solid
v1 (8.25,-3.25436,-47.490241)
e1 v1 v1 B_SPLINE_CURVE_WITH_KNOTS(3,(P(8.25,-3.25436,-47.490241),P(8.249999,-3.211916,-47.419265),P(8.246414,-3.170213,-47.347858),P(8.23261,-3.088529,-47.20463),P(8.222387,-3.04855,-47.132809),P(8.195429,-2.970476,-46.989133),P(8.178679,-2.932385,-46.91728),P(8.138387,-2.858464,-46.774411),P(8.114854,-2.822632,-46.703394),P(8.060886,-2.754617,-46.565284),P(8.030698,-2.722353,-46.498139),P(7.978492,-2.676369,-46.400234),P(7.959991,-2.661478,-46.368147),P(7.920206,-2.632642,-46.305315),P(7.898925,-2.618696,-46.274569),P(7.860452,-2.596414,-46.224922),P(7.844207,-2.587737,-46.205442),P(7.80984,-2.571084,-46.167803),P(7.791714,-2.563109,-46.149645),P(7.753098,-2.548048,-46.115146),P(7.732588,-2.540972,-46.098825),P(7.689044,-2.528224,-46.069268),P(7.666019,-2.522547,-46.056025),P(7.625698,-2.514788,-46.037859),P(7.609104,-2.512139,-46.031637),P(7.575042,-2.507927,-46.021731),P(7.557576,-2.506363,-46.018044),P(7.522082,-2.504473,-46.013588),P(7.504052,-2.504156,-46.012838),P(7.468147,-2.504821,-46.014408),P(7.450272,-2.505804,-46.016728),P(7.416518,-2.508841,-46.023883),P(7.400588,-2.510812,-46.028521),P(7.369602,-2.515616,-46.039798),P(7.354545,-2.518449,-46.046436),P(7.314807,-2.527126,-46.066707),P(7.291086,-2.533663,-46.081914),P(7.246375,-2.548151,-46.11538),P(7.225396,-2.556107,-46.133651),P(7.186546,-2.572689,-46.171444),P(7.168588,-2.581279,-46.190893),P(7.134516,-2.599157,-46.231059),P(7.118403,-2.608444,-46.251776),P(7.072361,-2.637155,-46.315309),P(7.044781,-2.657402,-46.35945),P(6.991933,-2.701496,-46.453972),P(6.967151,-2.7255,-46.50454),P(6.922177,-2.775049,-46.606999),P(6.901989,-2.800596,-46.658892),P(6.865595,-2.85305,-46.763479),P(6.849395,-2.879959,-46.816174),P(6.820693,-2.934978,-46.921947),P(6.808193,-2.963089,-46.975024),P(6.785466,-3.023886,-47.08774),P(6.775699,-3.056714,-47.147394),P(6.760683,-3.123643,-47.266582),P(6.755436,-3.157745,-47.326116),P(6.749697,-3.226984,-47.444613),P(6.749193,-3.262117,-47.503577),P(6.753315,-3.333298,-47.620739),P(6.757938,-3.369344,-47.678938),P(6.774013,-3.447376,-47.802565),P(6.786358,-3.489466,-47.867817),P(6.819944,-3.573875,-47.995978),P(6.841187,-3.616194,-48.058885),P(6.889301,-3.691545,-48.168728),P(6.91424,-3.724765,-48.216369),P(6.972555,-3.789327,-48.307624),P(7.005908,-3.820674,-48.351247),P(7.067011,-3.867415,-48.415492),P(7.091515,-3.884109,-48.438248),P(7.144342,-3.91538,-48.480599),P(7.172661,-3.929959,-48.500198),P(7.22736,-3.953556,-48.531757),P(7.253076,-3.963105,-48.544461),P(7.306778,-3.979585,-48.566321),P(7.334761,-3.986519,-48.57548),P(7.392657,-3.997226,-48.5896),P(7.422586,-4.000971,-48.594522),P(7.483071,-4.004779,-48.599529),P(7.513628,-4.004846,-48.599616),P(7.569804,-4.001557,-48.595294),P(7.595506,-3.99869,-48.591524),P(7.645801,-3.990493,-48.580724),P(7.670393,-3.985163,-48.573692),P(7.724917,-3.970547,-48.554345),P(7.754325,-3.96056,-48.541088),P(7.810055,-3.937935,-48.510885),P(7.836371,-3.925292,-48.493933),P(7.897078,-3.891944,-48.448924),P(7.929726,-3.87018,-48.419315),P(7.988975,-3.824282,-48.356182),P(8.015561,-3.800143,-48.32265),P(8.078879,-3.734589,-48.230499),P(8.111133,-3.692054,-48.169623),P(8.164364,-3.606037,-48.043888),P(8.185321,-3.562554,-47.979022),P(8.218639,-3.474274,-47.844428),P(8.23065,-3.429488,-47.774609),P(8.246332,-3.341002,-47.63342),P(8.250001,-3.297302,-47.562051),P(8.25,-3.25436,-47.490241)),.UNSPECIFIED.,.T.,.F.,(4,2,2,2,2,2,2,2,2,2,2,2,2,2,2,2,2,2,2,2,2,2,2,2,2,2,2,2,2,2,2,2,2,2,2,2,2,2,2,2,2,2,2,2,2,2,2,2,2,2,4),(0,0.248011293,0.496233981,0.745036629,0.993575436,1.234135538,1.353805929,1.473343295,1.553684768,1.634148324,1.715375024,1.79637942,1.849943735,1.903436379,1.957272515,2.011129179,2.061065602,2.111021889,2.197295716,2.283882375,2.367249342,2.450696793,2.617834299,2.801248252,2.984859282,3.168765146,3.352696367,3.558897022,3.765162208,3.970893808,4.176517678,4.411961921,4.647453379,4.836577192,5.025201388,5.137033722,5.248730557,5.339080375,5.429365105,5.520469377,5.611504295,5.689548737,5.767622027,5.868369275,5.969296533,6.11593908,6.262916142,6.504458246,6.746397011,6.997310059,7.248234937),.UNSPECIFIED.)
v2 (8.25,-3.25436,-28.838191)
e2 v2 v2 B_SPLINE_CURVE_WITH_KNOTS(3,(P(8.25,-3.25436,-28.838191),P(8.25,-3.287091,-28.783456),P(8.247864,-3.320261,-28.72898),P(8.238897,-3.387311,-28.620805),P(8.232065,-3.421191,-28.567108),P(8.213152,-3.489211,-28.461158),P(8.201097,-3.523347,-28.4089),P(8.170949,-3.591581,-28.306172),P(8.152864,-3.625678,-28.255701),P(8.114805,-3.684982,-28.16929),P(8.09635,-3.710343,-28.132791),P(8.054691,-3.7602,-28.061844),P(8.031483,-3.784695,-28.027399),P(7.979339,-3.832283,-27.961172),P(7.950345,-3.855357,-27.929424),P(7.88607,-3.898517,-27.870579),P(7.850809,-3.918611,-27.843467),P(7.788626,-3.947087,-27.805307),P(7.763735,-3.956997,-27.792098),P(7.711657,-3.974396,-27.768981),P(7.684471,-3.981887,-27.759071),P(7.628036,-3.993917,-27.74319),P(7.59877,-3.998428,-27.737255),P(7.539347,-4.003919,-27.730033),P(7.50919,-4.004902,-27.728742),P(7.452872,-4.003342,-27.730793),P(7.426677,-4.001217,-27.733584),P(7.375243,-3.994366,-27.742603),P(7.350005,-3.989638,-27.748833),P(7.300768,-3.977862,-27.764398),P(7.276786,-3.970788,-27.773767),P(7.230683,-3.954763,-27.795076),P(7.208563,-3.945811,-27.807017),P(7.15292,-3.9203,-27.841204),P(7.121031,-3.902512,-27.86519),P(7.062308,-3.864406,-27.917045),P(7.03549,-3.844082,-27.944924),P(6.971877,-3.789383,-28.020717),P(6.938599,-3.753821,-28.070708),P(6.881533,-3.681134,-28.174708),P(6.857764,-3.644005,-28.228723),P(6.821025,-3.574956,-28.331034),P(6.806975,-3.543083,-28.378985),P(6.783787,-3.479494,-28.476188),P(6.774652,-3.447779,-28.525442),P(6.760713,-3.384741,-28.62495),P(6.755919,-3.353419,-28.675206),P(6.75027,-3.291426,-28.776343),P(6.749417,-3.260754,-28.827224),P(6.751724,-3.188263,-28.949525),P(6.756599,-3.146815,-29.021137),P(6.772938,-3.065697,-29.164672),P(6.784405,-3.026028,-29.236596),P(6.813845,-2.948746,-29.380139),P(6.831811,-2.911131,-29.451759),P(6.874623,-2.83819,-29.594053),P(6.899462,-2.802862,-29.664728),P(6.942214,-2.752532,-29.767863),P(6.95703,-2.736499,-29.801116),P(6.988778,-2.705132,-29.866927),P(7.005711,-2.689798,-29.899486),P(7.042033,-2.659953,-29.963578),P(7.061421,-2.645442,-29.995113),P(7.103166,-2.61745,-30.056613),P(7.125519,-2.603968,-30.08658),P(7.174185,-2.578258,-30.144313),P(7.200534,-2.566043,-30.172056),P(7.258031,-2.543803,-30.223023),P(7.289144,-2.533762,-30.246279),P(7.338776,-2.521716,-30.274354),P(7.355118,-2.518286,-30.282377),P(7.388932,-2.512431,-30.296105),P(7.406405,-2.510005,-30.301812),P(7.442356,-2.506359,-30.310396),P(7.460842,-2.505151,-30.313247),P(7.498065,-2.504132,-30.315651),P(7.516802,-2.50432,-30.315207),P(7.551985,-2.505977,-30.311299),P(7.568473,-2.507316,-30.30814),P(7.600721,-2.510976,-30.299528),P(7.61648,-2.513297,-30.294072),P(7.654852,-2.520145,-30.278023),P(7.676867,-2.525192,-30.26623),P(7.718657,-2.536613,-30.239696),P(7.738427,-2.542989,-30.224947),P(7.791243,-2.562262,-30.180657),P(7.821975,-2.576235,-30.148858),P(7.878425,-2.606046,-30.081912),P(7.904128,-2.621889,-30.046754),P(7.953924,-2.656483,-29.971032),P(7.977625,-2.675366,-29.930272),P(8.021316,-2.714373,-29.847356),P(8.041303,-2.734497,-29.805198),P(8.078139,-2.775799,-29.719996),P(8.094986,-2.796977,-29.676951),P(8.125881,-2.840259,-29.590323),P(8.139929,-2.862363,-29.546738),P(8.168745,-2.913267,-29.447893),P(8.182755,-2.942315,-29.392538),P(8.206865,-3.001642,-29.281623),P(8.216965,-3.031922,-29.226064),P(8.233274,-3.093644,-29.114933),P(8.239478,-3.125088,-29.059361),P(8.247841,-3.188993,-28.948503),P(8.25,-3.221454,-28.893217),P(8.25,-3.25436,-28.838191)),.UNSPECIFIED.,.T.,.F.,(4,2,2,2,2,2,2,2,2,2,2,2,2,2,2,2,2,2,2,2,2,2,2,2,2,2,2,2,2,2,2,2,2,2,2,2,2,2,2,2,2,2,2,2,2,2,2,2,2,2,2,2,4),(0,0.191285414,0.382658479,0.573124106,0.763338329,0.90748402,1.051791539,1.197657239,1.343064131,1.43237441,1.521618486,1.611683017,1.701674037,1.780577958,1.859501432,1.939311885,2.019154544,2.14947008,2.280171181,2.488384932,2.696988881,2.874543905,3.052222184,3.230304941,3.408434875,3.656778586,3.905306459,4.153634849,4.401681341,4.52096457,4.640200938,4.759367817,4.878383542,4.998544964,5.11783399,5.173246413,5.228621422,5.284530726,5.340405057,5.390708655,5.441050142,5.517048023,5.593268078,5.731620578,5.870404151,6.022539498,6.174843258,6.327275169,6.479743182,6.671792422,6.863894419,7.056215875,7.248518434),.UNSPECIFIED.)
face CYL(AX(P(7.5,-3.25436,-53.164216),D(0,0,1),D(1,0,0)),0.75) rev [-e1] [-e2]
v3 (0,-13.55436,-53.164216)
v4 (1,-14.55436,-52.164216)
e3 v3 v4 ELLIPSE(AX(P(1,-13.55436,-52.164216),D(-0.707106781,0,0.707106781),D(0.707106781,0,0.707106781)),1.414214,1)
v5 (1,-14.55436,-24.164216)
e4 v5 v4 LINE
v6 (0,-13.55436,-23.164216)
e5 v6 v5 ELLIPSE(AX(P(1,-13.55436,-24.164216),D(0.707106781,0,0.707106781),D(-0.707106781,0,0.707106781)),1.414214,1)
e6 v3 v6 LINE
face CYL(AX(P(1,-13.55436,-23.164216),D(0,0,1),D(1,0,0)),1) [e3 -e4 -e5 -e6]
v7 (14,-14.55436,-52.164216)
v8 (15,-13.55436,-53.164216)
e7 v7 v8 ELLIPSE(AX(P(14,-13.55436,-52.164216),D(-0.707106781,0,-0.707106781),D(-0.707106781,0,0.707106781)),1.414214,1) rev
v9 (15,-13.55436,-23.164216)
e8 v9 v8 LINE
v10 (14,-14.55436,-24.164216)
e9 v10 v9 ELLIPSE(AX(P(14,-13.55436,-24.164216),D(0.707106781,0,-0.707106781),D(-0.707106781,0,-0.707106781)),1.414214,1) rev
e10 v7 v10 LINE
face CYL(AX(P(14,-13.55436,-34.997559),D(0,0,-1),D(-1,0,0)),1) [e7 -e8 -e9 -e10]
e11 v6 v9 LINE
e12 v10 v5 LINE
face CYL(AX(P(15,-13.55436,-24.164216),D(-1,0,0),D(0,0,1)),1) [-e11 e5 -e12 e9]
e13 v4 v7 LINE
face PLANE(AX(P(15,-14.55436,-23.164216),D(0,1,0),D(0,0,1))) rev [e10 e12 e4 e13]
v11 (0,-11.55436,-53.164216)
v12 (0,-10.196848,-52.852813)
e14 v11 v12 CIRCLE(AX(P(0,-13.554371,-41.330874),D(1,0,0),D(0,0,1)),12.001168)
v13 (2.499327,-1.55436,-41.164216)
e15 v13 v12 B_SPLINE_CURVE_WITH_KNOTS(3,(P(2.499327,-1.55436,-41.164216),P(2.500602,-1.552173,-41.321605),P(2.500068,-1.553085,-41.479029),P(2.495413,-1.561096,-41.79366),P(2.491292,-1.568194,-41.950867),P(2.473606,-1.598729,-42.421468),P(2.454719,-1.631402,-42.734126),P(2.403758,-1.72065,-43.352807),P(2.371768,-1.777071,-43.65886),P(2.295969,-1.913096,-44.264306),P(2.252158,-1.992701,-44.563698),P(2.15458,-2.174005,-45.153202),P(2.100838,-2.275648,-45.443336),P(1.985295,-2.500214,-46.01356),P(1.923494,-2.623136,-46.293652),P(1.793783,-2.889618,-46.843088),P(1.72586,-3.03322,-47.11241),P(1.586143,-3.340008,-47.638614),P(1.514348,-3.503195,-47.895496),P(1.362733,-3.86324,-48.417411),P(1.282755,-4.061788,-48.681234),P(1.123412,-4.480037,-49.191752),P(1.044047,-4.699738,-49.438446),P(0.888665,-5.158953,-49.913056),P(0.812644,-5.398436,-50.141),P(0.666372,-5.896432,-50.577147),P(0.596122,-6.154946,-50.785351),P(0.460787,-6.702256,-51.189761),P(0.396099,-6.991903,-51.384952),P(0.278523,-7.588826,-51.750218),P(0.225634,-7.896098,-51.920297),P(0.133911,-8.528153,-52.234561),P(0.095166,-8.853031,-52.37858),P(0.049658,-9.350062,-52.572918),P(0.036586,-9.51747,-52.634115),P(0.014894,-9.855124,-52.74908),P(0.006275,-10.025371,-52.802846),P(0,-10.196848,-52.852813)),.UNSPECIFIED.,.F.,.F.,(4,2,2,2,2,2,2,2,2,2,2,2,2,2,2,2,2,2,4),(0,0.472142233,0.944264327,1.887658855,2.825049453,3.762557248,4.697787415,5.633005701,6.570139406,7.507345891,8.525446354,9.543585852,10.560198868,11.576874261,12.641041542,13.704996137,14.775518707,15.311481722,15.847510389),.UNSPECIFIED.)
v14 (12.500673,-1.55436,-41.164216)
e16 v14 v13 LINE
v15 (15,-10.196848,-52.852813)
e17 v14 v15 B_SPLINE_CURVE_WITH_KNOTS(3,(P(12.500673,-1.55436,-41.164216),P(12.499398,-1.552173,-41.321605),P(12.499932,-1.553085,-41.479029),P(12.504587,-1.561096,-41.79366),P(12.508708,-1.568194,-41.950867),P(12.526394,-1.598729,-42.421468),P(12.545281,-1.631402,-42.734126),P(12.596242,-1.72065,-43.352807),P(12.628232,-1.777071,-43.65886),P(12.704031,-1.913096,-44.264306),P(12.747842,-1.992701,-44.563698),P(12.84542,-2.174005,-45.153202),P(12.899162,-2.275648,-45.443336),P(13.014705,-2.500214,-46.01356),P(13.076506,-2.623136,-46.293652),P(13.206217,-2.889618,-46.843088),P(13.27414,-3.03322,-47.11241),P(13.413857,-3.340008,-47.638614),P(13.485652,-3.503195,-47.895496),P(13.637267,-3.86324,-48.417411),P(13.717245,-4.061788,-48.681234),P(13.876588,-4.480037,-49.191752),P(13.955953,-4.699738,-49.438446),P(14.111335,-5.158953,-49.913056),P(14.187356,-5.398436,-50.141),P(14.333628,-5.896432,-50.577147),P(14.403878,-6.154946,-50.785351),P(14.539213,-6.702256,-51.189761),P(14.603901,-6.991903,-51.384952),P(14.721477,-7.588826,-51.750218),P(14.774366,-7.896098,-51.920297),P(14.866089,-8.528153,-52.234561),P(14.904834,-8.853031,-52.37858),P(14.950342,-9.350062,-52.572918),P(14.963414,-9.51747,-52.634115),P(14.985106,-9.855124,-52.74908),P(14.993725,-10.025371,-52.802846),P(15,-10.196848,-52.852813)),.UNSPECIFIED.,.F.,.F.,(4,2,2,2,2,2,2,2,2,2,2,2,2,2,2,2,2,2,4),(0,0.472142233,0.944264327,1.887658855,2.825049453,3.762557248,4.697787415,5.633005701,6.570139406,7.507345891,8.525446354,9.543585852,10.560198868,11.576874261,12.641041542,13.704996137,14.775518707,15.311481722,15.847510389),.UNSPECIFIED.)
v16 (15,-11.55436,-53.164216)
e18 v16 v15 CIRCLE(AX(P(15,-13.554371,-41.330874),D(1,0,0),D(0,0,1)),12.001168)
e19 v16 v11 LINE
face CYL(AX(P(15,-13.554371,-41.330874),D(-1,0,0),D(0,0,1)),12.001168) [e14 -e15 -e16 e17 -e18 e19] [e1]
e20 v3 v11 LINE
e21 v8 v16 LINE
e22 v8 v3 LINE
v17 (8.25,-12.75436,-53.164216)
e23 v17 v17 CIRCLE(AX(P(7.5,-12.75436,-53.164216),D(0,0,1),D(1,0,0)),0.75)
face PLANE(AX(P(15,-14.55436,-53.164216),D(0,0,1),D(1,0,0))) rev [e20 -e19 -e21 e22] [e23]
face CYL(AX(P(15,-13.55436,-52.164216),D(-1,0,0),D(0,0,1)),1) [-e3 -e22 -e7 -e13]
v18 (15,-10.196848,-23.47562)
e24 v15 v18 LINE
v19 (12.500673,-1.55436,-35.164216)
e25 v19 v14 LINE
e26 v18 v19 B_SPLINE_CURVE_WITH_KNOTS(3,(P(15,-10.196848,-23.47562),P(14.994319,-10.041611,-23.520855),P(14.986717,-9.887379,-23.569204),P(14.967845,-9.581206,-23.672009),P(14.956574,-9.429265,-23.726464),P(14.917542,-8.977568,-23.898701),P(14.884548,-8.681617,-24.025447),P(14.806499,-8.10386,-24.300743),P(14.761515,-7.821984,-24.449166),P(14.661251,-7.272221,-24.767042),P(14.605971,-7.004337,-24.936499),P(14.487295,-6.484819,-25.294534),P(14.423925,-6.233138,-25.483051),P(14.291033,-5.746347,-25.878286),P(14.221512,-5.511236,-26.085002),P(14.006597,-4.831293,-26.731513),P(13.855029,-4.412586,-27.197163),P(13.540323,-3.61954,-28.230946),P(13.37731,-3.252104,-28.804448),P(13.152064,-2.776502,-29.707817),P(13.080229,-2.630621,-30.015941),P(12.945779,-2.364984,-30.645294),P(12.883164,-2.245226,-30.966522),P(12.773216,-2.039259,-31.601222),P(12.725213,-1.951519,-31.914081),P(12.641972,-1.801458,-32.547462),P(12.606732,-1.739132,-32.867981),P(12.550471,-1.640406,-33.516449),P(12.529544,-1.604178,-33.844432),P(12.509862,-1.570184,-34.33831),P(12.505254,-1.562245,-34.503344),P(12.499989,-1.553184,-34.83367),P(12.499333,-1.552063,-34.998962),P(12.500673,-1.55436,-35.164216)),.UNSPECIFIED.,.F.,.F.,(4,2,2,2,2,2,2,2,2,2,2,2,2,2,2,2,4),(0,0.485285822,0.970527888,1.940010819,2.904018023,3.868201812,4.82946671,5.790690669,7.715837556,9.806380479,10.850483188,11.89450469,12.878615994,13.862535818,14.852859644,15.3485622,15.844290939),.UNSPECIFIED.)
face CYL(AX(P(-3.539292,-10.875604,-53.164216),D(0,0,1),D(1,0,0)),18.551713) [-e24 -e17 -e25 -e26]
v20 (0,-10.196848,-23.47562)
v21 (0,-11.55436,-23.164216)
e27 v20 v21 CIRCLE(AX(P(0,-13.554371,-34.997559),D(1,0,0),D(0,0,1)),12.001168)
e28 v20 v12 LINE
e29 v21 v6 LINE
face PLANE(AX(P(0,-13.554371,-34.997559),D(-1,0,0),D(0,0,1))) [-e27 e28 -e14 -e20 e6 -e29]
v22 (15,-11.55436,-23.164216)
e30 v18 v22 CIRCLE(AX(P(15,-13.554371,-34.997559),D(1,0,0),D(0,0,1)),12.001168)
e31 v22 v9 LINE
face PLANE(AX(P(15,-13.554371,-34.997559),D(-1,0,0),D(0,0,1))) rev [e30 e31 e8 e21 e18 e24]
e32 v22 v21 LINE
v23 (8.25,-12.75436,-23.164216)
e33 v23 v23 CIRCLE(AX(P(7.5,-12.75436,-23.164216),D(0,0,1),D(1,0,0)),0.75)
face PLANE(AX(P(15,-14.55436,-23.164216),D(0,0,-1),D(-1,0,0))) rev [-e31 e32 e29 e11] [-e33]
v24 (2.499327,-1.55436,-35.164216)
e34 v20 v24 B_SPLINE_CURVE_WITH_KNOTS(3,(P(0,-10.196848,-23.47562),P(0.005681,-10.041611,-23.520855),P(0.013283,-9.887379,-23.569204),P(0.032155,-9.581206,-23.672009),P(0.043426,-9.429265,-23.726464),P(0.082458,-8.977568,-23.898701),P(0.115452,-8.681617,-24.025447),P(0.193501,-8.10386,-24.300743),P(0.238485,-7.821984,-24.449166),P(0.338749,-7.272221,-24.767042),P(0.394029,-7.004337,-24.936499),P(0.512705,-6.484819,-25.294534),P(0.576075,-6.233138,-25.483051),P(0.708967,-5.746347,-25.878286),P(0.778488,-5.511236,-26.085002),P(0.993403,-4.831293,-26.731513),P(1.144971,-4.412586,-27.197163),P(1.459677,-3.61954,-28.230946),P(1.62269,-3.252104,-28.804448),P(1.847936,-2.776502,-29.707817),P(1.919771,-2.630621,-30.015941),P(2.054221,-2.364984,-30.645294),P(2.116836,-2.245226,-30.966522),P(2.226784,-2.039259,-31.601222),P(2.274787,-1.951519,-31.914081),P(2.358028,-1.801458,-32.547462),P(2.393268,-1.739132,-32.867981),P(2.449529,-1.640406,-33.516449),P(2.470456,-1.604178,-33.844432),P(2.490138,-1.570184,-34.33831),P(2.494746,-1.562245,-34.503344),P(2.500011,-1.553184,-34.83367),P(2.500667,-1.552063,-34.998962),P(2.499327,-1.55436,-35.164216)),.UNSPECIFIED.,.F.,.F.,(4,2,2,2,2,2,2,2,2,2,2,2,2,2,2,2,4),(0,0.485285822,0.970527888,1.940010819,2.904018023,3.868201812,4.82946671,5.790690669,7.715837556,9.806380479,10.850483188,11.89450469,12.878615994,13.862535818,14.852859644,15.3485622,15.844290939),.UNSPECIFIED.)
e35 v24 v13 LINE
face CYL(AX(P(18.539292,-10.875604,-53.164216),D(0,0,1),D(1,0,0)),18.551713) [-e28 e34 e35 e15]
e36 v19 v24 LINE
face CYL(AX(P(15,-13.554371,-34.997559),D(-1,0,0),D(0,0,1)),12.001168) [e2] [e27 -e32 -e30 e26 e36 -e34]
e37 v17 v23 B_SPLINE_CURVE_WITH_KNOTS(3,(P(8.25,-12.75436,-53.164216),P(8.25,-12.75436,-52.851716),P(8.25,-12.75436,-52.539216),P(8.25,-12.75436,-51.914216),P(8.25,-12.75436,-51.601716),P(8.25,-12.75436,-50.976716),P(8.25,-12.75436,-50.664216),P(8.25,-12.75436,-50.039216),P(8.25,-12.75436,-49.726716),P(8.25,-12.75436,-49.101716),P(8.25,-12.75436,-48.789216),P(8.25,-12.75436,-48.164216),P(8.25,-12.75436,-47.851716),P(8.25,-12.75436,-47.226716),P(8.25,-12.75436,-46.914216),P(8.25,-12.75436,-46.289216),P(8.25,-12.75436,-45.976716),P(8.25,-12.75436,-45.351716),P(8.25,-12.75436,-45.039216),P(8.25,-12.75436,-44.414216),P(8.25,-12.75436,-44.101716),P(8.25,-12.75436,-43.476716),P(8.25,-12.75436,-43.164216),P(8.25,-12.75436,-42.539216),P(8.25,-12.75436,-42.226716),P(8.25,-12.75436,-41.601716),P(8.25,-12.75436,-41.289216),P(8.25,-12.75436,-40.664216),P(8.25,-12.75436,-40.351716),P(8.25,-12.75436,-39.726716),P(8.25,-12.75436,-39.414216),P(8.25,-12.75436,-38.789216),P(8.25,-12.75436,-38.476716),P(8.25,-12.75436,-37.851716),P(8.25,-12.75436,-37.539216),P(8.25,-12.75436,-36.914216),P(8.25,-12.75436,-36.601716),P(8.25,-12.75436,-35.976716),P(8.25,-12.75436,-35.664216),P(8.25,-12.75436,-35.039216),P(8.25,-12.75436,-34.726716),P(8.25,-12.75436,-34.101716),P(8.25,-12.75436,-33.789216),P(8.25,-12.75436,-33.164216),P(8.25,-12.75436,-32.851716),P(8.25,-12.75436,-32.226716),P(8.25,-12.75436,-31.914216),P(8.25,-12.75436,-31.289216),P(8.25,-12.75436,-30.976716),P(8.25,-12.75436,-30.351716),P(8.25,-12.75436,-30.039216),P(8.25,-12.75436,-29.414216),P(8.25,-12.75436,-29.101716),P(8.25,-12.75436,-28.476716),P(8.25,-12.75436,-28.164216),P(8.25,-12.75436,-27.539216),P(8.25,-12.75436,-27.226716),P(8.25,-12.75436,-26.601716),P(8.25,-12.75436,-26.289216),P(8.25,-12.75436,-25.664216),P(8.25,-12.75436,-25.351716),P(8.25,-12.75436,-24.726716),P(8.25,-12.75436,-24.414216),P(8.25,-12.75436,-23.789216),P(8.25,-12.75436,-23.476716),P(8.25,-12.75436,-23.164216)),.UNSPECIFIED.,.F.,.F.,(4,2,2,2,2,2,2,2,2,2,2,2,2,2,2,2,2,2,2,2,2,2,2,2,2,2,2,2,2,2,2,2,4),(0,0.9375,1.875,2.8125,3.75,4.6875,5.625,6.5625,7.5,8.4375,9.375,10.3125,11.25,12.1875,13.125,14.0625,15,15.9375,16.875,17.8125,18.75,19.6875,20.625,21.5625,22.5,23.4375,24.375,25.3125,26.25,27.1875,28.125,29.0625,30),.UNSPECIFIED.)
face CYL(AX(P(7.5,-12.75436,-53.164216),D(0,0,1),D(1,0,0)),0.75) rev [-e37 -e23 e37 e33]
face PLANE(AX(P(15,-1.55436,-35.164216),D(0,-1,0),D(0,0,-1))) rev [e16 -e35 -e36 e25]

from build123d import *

# Parameters (mm, degrees)
BOSS_EXTRUDE1_DEPTH = 15
CUT_EXTRUDE1_START  = -52.852812827
CUT_EXTRUDE1_DEPTH  = 29.377193365
SKETCH4_R           = 0.75
CUT_EXTRUDE2_DEPTH  = 37.562677601
FILLET1_R           = 1


# Read off the part's stored shape, not the designer's step: Cut-Extrude1
with BuildPart() as part:
    # Sketch2 → Boss-Extrude1 (new body)
    with BuildSketch(Plane(origin=(0, 0, 0), x_dir=(0, 0, -1), z_dir=(1, 0, 0))):
        with BuildLine():
            Line((23.164216144, -14.554359634), (53.164216144, -14.554359634))
            Line((53.164216144, -14.554359634), (53.164216144, -11.554359634))
            ThreePointArc((53.164216144, -11.554359634), (49.01383429, -4.334817859), (41.164216144, -1.554359634))
            Line((41.164216144, -1.554359634), (35.164216144, -1.554359634))
            ThreePointArc((35.164216144, -1.554359634), (27.314597998, -4.334817859), (23.164216144, -11.554359634))
            Line((23.164216144, -11.554359634), (23.164216144, -14.554359634))
        make_face()
    extrude(amount=BOSS_EXTRUDE1_DEPTH)

    # Cut-Extrude1 outline → Cut-Extrude1 (cut)
    with BuildSketch(Plane.XY.offset(CUT_EXTRUDE1_START)):
        with BuildLine():
            Line((2.5, -1.553202413), (0, -1.553202413))
            Line((0, -1.553202413), (0, -10.196848008))
            ThreePointArc((0, -10.196848008), (0.718019025, -5.721160452), (2.5, -1.553202413))
        make_face()
        with BuildLine():
            Line((15, -1.553202413), (12.5, -1.553202413))
            ThreePointArc((12.5, -1.553202413), (14.281980975, -5.721160452), (15, -10.196848008))
            Line((15, -10.196848008), (15, -1.553202413))
        make_face()
    extrude(amount=CUT_EXTRUDE1_DEPTH, mode=Mode.SUBTRACT)

    # Sketch4 → Cut-Extrude2 (cut, through all)
    with BuildSketch(Plane.XY.offset(-23.164216144)):
        with Locations((7.5, -12.754359634)):
            Circle(SKETCH4_R)
        with Locations((7.5, -3.254359634)):
            Circle(SKETCH4_R)
    extrude(amount=-CUT_EXTRUDE2_DEPTH, mode=Mode.SUBTRACT)

    # Fillet1
    fillet1_edges = [part.edges().sort_by_distance(p)[0] for p in [
        (7.5, -14.554359634, -53.164216144),
        (7.5, -14.554359634, -23.164216144),
        (0, -14.554359634, -38.164216144),
        (15, -14.554359634, -38.164216144),
    ]]
    fillet(fillet1_edges, radius=FILLET1_R)


solid = part.part
